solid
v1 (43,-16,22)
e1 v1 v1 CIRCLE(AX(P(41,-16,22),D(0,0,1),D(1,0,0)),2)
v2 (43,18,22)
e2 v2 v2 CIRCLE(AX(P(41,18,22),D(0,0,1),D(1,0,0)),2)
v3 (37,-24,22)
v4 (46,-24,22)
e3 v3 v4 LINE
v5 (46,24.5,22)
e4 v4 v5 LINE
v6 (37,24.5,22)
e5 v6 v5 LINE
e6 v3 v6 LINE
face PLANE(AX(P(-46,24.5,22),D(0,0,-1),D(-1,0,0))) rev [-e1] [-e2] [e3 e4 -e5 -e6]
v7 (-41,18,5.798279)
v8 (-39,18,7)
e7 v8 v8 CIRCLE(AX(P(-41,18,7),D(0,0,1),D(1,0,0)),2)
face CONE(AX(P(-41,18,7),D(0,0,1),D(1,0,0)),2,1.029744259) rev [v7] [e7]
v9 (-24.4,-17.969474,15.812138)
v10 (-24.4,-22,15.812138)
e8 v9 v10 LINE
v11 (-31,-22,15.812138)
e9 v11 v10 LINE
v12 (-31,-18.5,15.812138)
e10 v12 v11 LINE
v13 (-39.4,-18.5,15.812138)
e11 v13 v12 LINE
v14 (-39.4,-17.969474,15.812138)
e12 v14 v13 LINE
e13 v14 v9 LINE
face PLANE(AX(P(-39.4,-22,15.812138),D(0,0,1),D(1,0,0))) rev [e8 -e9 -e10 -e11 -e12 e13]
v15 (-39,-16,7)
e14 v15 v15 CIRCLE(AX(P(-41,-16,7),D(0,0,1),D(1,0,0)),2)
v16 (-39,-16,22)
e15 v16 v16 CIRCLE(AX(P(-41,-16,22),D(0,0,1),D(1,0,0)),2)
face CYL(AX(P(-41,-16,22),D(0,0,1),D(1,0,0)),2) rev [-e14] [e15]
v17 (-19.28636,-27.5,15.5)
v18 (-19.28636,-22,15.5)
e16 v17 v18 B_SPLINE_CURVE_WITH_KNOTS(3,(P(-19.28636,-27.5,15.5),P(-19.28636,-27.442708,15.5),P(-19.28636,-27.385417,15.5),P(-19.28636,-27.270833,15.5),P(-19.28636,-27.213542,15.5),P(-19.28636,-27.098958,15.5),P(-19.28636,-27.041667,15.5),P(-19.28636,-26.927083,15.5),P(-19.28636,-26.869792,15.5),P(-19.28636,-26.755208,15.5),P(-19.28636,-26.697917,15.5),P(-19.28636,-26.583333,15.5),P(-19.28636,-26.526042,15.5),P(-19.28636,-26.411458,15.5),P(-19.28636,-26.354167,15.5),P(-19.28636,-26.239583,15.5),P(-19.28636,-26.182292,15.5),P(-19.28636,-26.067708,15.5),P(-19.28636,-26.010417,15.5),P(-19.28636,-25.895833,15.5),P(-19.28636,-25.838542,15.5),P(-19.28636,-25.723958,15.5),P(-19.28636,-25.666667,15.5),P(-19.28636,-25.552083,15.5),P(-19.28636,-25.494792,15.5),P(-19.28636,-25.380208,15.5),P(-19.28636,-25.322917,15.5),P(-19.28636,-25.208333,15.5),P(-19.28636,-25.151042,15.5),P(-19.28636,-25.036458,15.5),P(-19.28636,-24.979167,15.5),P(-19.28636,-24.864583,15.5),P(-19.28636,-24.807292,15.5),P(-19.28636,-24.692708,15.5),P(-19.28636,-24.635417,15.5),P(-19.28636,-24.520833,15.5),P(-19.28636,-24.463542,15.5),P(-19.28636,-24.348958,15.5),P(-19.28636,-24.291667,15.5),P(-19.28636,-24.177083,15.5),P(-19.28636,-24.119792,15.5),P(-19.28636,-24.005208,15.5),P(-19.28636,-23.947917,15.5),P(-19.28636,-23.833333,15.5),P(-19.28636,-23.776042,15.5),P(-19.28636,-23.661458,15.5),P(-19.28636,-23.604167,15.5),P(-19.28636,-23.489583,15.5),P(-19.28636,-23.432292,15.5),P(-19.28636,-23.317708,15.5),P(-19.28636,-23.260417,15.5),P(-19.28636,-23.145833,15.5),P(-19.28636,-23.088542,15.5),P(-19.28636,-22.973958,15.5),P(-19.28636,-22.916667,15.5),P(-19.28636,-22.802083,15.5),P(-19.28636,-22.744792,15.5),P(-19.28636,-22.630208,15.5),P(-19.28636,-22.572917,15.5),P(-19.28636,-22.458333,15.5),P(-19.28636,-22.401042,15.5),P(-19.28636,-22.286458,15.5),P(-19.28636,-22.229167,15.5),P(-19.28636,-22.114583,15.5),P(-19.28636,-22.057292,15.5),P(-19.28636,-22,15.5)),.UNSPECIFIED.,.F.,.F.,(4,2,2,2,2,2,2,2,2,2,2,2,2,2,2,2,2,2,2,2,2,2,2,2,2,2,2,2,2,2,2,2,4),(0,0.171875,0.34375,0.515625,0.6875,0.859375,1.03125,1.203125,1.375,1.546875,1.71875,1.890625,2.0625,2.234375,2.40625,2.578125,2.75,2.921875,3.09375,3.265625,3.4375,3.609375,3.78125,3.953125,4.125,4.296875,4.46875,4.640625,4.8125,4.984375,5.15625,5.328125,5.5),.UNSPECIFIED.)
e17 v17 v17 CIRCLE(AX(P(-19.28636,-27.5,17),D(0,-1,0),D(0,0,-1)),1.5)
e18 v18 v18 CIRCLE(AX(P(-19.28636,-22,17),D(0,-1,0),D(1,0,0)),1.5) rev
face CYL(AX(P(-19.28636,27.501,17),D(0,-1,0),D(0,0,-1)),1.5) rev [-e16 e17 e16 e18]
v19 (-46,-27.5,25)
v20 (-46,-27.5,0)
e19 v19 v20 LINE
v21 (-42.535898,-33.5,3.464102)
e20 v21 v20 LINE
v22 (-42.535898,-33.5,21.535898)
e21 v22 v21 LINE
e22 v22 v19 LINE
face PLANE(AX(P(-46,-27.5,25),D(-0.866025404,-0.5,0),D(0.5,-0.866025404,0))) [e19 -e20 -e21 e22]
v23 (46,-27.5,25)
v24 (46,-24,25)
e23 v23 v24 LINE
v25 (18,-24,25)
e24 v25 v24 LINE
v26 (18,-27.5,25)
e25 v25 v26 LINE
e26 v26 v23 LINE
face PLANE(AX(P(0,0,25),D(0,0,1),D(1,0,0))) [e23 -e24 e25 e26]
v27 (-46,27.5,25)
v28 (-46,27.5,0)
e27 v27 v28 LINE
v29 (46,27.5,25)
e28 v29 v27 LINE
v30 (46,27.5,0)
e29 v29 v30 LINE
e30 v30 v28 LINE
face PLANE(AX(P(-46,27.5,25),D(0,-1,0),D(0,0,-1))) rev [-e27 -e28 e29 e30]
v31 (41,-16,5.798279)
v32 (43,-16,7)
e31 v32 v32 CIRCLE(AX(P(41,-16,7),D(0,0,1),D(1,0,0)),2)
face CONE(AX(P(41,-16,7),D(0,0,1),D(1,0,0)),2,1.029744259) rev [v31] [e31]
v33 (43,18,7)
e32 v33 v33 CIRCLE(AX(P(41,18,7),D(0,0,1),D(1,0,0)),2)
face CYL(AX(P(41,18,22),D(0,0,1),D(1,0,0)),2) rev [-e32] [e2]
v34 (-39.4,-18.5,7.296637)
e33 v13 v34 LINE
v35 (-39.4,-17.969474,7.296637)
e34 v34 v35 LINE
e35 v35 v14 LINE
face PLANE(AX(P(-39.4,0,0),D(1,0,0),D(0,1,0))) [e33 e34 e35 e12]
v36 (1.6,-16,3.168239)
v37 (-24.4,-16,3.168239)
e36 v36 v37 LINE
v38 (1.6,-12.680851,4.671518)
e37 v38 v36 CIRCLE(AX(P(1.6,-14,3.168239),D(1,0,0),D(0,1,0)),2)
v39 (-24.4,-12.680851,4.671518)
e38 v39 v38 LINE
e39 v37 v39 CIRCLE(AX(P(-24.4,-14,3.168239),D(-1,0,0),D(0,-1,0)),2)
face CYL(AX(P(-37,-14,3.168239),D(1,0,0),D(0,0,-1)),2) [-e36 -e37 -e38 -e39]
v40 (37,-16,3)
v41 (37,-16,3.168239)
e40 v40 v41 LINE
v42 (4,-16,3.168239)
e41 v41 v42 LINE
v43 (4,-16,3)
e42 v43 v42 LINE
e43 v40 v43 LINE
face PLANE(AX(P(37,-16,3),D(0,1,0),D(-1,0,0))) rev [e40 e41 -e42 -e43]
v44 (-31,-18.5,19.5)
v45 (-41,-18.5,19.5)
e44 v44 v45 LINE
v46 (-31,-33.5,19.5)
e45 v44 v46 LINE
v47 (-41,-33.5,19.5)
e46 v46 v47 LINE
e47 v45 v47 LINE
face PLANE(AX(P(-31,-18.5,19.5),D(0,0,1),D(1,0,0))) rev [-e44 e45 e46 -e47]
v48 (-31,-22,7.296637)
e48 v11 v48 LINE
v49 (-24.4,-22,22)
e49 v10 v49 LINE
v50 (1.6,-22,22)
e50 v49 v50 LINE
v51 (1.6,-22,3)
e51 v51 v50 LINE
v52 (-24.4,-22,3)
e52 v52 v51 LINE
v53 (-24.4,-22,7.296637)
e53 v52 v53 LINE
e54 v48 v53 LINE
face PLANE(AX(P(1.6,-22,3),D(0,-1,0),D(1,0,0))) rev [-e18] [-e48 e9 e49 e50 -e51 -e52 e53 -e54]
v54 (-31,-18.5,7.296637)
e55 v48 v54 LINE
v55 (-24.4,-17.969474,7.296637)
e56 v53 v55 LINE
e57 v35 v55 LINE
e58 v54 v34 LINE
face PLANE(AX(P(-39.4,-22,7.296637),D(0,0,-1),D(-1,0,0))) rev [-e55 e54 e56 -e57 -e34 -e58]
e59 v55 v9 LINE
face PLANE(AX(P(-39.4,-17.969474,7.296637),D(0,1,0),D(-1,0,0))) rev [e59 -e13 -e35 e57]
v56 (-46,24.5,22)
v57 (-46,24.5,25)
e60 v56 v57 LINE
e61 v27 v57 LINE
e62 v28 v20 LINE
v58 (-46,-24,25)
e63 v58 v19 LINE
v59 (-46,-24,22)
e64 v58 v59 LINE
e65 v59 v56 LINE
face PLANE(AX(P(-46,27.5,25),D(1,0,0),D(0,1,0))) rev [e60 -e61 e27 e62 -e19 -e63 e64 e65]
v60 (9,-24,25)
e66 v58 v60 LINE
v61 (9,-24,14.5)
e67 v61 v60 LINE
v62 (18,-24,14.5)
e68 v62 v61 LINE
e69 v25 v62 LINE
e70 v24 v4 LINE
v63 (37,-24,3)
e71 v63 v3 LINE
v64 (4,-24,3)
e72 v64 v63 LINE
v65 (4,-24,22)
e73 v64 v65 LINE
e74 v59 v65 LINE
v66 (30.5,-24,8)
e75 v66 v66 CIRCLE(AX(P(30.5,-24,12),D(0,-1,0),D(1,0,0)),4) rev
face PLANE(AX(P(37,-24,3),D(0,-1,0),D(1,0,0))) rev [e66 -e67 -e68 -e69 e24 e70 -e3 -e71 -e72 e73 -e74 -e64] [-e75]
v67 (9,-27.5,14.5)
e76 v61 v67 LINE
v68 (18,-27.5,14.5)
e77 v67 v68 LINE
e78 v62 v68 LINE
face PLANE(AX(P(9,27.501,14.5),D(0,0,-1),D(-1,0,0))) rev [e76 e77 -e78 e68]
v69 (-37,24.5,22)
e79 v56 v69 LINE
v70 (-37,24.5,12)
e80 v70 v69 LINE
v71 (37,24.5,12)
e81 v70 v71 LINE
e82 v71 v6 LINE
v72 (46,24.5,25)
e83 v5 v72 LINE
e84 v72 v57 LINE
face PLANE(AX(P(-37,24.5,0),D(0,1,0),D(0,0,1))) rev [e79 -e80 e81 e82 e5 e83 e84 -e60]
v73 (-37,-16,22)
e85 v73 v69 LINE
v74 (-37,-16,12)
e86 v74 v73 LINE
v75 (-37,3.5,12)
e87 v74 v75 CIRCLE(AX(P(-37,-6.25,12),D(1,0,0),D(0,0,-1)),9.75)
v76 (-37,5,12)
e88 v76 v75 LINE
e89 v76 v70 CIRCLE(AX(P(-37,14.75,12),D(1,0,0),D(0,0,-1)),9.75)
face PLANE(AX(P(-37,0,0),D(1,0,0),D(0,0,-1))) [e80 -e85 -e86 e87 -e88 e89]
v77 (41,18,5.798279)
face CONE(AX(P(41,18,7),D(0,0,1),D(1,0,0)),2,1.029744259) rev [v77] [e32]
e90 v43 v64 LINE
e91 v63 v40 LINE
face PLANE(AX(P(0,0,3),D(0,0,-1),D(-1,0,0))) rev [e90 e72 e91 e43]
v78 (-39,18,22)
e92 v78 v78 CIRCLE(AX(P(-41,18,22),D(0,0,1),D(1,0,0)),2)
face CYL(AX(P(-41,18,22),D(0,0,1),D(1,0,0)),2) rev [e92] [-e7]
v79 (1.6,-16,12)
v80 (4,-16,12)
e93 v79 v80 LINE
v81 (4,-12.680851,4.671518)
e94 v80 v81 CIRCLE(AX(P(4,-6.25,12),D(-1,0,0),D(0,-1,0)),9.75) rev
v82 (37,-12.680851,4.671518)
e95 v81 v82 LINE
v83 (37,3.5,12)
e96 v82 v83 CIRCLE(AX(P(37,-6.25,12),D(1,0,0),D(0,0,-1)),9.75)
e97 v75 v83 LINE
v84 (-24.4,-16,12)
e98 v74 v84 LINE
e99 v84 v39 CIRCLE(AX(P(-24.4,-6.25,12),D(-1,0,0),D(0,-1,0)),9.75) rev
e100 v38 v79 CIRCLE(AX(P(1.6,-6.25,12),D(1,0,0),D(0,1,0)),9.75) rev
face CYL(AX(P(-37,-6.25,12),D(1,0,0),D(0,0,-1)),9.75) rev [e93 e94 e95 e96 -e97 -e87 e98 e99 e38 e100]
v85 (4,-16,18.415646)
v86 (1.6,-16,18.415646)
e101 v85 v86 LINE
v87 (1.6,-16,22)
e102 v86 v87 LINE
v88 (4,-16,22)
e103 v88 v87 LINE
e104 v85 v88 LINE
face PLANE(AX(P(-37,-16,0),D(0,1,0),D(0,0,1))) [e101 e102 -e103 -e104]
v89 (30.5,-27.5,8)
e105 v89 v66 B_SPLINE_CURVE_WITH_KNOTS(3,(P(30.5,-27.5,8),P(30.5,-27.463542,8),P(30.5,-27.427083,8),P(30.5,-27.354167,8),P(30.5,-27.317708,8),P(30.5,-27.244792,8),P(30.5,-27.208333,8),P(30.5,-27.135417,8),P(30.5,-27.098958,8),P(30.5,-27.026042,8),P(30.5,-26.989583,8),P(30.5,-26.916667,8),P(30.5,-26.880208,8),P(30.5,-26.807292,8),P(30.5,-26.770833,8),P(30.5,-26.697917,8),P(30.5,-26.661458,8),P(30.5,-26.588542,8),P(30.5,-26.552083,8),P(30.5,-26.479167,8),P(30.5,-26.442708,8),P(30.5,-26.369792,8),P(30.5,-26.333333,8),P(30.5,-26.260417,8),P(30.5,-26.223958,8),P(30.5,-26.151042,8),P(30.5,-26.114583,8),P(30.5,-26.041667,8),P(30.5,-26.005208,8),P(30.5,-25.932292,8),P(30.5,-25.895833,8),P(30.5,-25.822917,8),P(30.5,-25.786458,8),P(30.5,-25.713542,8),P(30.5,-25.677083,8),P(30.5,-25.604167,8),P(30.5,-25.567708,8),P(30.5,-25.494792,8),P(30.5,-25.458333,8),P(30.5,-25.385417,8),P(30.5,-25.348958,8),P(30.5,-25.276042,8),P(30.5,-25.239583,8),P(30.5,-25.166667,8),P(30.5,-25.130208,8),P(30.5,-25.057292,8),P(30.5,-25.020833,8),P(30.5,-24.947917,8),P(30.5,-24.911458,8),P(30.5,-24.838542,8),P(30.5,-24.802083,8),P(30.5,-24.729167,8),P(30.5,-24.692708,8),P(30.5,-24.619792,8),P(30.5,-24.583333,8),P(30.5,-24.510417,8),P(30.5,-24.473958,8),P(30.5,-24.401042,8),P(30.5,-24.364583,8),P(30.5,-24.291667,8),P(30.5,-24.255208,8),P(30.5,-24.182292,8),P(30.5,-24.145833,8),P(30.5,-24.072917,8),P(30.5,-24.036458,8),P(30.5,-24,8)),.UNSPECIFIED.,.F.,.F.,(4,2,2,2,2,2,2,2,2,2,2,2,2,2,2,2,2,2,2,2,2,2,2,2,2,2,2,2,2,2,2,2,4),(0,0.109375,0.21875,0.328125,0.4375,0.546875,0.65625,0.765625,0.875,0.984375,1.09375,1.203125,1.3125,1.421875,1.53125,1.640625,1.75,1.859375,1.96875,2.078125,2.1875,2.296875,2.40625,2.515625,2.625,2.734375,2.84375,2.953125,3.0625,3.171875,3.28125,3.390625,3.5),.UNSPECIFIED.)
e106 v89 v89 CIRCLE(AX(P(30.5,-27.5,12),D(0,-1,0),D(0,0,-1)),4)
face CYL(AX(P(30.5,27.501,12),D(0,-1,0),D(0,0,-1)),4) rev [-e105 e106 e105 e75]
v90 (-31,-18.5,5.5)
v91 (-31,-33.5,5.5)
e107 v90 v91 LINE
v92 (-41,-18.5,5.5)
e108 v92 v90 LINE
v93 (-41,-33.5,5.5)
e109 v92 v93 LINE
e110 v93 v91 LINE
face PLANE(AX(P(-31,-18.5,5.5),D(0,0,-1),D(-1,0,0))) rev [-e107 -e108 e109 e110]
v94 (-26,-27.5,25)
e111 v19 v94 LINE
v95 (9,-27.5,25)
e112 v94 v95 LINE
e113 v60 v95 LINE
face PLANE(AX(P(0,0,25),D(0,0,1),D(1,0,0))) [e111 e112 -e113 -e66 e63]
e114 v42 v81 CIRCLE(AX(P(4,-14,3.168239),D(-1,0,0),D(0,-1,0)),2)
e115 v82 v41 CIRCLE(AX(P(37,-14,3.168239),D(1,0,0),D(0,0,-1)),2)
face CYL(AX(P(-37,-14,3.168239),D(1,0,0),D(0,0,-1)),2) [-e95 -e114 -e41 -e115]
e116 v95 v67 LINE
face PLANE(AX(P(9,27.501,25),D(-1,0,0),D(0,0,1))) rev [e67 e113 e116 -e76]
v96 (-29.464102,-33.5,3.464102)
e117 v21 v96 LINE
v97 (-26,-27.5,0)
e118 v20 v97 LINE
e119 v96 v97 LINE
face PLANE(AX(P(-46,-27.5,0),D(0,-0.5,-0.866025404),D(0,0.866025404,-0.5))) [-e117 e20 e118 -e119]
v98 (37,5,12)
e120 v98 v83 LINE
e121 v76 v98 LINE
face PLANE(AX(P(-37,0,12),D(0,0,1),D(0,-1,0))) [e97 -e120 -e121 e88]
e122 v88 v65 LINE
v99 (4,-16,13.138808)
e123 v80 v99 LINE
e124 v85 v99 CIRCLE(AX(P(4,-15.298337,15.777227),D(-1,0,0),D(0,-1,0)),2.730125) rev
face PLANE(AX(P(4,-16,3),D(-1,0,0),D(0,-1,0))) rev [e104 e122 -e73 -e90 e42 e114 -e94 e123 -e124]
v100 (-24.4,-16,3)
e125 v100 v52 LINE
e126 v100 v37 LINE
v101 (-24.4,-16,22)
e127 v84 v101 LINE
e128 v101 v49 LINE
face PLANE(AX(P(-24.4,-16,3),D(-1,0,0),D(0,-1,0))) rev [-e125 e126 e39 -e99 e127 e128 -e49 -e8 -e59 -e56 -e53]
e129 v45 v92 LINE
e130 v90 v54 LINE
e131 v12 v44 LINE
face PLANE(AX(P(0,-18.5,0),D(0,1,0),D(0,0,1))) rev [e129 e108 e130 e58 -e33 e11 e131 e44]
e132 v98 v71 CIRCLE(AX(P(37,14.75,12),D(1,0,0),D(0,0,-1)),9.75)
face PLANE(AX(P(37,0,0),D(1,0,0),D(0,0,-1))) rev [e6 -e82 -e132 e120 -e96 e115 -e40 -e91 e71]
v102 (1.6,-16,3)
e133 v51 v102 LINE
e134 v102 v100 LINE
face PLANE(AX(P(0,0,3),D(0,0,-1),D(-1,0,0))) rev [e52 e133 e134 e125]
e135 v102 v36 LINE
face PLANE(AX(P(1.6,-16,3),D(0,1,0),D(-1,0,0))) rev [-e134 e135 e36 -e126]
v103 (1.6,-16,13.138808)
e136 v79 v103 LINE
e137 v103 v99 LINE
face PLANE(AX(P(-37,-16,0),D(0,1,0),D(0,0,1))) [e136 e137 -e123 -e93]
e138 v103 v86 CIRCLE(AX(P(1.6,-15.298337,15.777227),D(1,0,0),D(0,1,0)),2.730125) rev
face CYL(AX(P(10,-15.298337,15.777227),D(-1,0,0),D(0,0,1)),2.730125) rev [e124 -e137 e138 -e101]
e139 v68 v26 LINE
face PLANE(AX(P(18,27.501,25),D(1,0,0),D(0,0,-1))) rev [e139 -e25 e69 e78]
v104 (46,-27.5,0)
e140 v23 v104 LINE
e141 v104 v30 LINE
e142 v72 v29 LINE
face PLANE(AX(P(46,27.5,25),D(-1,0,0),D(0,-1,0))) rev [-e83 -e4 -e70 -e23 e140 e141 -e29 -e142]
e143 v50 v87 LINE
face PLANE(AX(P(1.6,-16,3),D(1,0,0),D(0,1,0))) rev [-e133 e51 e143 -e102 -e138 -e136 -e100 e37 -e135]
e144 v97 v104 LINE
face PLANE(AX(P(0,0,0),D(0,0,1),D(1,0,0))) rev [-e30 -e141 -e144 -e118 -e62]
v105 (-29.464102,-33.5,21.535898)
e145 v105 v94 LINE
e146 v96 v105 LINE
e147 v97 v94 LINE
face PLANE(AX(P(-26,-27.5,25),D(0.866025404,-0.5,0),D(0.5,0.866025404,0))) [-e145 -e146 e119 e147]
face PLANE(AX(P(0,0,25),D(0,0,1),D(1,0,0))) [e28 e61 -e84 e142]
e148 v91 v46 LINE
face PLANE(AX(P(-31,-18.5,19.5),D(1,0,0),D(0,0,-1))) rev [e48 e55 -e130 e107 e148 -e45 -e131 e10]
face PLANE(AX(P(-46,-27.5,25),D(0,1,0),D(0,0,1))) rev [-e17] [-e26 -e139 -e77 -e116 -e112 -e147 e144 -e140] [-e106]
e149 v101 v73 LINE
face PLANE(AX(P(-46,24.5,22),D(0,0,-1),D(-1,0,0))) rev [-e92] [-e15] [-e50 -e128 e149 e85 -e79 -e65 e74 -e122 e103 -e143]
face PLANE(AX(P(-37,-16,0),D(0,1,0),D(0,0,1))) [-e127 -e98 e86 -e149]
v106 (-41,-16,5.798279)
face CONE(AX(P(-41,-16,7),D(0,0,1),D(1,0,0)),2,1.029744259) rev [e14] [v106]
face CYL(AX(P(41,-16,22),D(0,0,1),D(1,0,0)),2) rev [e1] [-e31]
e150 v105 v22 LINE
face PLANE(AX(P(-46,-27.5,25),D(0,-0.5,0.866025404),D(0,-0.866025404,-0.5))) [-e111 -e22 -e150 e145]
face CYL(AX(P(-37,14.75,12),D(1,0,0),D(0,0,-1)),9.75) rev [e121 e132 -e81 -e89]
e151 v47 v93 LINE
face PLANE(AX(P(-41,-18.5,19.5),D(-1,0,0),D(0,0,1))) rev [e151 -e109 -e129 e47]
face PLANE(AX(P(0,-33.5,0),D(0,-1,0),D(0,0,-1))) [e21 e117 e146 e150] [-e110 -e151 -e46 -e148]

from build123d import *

# Parameters (mm, degrees)
SKETCH1_W            = 92
SKETCH1_H            = 55
BODY_DEPTH           = 25
BATTERY_DEPTH        = 37
SKETCH3_W            = 33
SKETCH3_H            = 8
CONTROLLER_DEPTH     = 22
CUT_EXTRUDE3_REACH   = 77.934
SKETCH4_R            = 4
CONNECTOR_REACH      = 77.934
SKETCH5_W            = 9
SKETCH5_H            = 10.5
SKETCH6_W            = 26
SKETCH6_H            = 6
CHARGER_DEPTH        = 22
CHGLED_REACH         = 77.934
SKETCH7_R            = 1.5
SKETCH8_W            = 20
SKETCH8_H            = 25
BOSS_EXTRUDE1_DEPTH  = 6
BOSS_EXTRUDE1_TAPER  = 30
SKETCH9_W            = 10
SKETCH9_H            = 14
CUT_EXTRUDE7_DEPTH   = 15
SKETCH10_W           = 8.515500197
SKETCH10_H           = 4.030526349
CUT_EXTRUDE8_DEPTH   = 15
SKETCH11_W           = 3
SKETCH11_H           = 48.5
CUT_EXTRUDE9_DEPTH   = 102.050729983
LPATTERN1_COUNT      = 2
LPATTERN1_PITCH      = 82
LPATTERN1_COUNT_DIR2 = 2
LPATTERN1_PITCH_DIR2 = 34
FILLET1_R            = 2
SKETCH14_R           = 2.730125357
CUT_EXTRUDE10_DEPTH  = 10


with BuildPart() as part:
    # Sketch1 → Body (new body)
    with BuildSketch(Plane.XY):
        Rectangle(SKETCH1_W, SKETCH1_H)
    extrude(amount=BODY_DEPTH)

    # Sketch2 → Battery (cut, symmetric)
    with BuildSketch(Plane(origin=(0, 0, 0), x_dir=(0, 0, -1), z_dir=(1, 0, 0))):
        with BuildLine():
            Line((-12, 3.5), (-12, 5))
            ThreePointArc((-12, 5), (-2.25, 14.75), (-12, 24.5))
            Line((-12, 24.5), (-28.22158826, 24.5))
            Line((-28.22158826, 24.5), (-28.22158826, -16))
            Line((-28.22158826, -16), (-12, -16))
            ThreePointArc((-12, -16), (-2.25, -6.25), (-12, 3.5))
        make_face()
    extrude(amount=BATTERY_DEPTH, both=True, mode=Mode.SUBTRACT)

    # Sketch3 → Controller (cut)
    with BuildSketch(Plane.XY.offset(25)):
        with Locations((20.5, -20)):
            Rectangle(SKETCH3_W, SKETCH3_H)
    extrude(amount=-CONTROLLER_DEPTH, mode=Mode.SUBTRACT)

    # Sketch4 → Cut-Extrude3 (cut, up to next)
    with BuildSketch(Plane.XZ.offset(27.5), mode=Mode.PRIVATE) as cut_extrude3_sk1:
        with Locations((30.5, 12)):
            Circle(SKETCH4_R)
    cut_extrude3_tool1 = extrude(cut_extrude3_sk1.sketch, amount=-CUT_EXTRUDE3_REACH, mode=Mode.PRIVATE) & part.part
    add(cut_extrude3_tool1.solids().sort_by_distance((30.5, -27.5, 12))[0], mode=Mode.SUBTRACT)

    # Sketch5 → Connector (cut, up to next)
    with BuildSketch(Plane.XZ.offset(27.5), mode=Mode.PRIVATE) as connector_sk1:
        with Locations((13.5, 19.75)):
            Rectangle(SKETCH5_W, SKETCH5_H)
    connector_tool1 = extrude(connector_sk1.sketch, amount=-CONNECTOR_REACH, mode=Mode.PRIVATE) & part.part
    add(connector_tool1.solids().sort_by_distance((13.5, -27.5, 19.75))[0], mode=Mode.SUBTRACT)

    # Sketch6 → Charger (cut)
    with BuildSketch(Plane.XY.offset(25)):
        with Locations((-11.4, -19)):
            Rectangle(SKETCH6_W, SKETCH6_H)
    extrude(amount=-CHARGER_DEPTH, mode=Mode.SUBTRACT)

    # Sketch7 → ChgLED (cut, up to next)
    with BuildSketch(Plane(origin=(0, -27.5, 0), x_dir=(-1, 0, 0), z_dir=(0, -1, 0)), mode=Mode.PRIVATE) as chgled_sk1:
        with Locations((19.286360004, -17)):
            Circle(SKETCH7_R)
    chgled_tool1 = extrude(chgled_sk1.sketch, amount=-CHGLED_REACH, mode=Mode.PRIVATE) & part.part
    add(chgled_tool1.solids().sort_by_distance((-19.28636, -27.5, 17))[0], mode=Mode.SUBTRACT)

    # Sketch8 → Boss-Extrude1 (add)
    with BuildSketch(Plane.XZ.offset(27.5)):
        with Locations((-36, 12.5)):
            Rectangle(SKETCH8_W, SKETCH8_H)
    extrude(amount=BOSS_EXTRUDE1_DEPTH, taper=BOSS_EXTRUDE1_TAPER)

    # Sketch9 → Cut-Extrude7 (cut)
    with BuildSketch(Plane.XZ.offset(33.5)):
        with Locations((-36, 12.5)):
            Rectangle(SKETCH9_W, SKETCH9_H)
    extrude(amount=-CUT_EXTRUDE7_DEPTH, mode=Mode.SUBTRACT)

    # Sketch10 → Cut-Extrude8 (cut)
    with BuildSketch(Plane(origin=(-24.4, 0, 0), x_dir=(0, 0, -1), z_dir=(1, 0, 0))):
        with Locations((-11.554387417, -19.984736826)):
            Rectangle(SKETCH10_W, SKETCH10_H)
    extrude(amount=-CUT_EXTRUDE8_DEPTH, mode=Mode.SUBTRACT)

    # Sketch11 → Cut-Extrude9 (cut, through all)
    with BuildSketch(Plane(origin=(46, 0, 0), x_dir=(0, 0, -1), z_dir=(1, 0, 0))):
        with Locations((-23.5, 0.25)):
            Rectangle(SKETCH11_W, SKETCH11_H)
    extrude(amount=-CUT_EXTRUDE9_DEPTH, mode=Mode.SUBTRACT)

    # Sketch13 → Ø4.0mm Dowel Hole1 (revolve, cut)
    with BuildSketch(Plane(origin=(41, 18, 22), x_dir=(0, -1, 0), z_dir=(1, 0, 0))):
        Polygon((0, 0), (0, 16.201721238), (2, 15), (2, 0), align=None)
    f_4_0mm_dowel_hole1 = revolve(axis=Axis((41, 18, 28.35), (0, 0, -1)), mode=Mode.SUBTRACT)

    # LPattern1: 4.0mm Dowel Hole1 2 × 2
    with Locations(*[(-i * LPATTERN1_PITCH, -j * LPATTERN1_PITCH_DIR2, 0) for i in range(LPATTERN1_COUNT) for j in range(LPATTERN1_COUNT_DIR2) if (i, j) != (0, 0)]):
        add(f_4_0mm_dowel_hole1, mode=Mode.SUBTRACT)

    # Fillet1
    fillet1_edges = [part.edges().sort_by_distance(p)[0] for p in [
        (-11.4, -16, 12),
        (20.5, -16, 12),
    ]]
    fillet(fillet1_edges, radius=FILLET1_R)

    # Sketch14 → Cut-Extrude10 (cut)
    with BuildSketch(Plane(origin=(0, 0, 0), x_dir=(0, 0, -1), z_dir=(1, 0, 0))):
        with Locations((-15.777227018, -15.298336579)):
            Circle(SKETCH14_R)
    extrude(amount=CUT_EXTRUDE10_DEPTH, mode=Mode.SUBTRACT)


solid = part.part
